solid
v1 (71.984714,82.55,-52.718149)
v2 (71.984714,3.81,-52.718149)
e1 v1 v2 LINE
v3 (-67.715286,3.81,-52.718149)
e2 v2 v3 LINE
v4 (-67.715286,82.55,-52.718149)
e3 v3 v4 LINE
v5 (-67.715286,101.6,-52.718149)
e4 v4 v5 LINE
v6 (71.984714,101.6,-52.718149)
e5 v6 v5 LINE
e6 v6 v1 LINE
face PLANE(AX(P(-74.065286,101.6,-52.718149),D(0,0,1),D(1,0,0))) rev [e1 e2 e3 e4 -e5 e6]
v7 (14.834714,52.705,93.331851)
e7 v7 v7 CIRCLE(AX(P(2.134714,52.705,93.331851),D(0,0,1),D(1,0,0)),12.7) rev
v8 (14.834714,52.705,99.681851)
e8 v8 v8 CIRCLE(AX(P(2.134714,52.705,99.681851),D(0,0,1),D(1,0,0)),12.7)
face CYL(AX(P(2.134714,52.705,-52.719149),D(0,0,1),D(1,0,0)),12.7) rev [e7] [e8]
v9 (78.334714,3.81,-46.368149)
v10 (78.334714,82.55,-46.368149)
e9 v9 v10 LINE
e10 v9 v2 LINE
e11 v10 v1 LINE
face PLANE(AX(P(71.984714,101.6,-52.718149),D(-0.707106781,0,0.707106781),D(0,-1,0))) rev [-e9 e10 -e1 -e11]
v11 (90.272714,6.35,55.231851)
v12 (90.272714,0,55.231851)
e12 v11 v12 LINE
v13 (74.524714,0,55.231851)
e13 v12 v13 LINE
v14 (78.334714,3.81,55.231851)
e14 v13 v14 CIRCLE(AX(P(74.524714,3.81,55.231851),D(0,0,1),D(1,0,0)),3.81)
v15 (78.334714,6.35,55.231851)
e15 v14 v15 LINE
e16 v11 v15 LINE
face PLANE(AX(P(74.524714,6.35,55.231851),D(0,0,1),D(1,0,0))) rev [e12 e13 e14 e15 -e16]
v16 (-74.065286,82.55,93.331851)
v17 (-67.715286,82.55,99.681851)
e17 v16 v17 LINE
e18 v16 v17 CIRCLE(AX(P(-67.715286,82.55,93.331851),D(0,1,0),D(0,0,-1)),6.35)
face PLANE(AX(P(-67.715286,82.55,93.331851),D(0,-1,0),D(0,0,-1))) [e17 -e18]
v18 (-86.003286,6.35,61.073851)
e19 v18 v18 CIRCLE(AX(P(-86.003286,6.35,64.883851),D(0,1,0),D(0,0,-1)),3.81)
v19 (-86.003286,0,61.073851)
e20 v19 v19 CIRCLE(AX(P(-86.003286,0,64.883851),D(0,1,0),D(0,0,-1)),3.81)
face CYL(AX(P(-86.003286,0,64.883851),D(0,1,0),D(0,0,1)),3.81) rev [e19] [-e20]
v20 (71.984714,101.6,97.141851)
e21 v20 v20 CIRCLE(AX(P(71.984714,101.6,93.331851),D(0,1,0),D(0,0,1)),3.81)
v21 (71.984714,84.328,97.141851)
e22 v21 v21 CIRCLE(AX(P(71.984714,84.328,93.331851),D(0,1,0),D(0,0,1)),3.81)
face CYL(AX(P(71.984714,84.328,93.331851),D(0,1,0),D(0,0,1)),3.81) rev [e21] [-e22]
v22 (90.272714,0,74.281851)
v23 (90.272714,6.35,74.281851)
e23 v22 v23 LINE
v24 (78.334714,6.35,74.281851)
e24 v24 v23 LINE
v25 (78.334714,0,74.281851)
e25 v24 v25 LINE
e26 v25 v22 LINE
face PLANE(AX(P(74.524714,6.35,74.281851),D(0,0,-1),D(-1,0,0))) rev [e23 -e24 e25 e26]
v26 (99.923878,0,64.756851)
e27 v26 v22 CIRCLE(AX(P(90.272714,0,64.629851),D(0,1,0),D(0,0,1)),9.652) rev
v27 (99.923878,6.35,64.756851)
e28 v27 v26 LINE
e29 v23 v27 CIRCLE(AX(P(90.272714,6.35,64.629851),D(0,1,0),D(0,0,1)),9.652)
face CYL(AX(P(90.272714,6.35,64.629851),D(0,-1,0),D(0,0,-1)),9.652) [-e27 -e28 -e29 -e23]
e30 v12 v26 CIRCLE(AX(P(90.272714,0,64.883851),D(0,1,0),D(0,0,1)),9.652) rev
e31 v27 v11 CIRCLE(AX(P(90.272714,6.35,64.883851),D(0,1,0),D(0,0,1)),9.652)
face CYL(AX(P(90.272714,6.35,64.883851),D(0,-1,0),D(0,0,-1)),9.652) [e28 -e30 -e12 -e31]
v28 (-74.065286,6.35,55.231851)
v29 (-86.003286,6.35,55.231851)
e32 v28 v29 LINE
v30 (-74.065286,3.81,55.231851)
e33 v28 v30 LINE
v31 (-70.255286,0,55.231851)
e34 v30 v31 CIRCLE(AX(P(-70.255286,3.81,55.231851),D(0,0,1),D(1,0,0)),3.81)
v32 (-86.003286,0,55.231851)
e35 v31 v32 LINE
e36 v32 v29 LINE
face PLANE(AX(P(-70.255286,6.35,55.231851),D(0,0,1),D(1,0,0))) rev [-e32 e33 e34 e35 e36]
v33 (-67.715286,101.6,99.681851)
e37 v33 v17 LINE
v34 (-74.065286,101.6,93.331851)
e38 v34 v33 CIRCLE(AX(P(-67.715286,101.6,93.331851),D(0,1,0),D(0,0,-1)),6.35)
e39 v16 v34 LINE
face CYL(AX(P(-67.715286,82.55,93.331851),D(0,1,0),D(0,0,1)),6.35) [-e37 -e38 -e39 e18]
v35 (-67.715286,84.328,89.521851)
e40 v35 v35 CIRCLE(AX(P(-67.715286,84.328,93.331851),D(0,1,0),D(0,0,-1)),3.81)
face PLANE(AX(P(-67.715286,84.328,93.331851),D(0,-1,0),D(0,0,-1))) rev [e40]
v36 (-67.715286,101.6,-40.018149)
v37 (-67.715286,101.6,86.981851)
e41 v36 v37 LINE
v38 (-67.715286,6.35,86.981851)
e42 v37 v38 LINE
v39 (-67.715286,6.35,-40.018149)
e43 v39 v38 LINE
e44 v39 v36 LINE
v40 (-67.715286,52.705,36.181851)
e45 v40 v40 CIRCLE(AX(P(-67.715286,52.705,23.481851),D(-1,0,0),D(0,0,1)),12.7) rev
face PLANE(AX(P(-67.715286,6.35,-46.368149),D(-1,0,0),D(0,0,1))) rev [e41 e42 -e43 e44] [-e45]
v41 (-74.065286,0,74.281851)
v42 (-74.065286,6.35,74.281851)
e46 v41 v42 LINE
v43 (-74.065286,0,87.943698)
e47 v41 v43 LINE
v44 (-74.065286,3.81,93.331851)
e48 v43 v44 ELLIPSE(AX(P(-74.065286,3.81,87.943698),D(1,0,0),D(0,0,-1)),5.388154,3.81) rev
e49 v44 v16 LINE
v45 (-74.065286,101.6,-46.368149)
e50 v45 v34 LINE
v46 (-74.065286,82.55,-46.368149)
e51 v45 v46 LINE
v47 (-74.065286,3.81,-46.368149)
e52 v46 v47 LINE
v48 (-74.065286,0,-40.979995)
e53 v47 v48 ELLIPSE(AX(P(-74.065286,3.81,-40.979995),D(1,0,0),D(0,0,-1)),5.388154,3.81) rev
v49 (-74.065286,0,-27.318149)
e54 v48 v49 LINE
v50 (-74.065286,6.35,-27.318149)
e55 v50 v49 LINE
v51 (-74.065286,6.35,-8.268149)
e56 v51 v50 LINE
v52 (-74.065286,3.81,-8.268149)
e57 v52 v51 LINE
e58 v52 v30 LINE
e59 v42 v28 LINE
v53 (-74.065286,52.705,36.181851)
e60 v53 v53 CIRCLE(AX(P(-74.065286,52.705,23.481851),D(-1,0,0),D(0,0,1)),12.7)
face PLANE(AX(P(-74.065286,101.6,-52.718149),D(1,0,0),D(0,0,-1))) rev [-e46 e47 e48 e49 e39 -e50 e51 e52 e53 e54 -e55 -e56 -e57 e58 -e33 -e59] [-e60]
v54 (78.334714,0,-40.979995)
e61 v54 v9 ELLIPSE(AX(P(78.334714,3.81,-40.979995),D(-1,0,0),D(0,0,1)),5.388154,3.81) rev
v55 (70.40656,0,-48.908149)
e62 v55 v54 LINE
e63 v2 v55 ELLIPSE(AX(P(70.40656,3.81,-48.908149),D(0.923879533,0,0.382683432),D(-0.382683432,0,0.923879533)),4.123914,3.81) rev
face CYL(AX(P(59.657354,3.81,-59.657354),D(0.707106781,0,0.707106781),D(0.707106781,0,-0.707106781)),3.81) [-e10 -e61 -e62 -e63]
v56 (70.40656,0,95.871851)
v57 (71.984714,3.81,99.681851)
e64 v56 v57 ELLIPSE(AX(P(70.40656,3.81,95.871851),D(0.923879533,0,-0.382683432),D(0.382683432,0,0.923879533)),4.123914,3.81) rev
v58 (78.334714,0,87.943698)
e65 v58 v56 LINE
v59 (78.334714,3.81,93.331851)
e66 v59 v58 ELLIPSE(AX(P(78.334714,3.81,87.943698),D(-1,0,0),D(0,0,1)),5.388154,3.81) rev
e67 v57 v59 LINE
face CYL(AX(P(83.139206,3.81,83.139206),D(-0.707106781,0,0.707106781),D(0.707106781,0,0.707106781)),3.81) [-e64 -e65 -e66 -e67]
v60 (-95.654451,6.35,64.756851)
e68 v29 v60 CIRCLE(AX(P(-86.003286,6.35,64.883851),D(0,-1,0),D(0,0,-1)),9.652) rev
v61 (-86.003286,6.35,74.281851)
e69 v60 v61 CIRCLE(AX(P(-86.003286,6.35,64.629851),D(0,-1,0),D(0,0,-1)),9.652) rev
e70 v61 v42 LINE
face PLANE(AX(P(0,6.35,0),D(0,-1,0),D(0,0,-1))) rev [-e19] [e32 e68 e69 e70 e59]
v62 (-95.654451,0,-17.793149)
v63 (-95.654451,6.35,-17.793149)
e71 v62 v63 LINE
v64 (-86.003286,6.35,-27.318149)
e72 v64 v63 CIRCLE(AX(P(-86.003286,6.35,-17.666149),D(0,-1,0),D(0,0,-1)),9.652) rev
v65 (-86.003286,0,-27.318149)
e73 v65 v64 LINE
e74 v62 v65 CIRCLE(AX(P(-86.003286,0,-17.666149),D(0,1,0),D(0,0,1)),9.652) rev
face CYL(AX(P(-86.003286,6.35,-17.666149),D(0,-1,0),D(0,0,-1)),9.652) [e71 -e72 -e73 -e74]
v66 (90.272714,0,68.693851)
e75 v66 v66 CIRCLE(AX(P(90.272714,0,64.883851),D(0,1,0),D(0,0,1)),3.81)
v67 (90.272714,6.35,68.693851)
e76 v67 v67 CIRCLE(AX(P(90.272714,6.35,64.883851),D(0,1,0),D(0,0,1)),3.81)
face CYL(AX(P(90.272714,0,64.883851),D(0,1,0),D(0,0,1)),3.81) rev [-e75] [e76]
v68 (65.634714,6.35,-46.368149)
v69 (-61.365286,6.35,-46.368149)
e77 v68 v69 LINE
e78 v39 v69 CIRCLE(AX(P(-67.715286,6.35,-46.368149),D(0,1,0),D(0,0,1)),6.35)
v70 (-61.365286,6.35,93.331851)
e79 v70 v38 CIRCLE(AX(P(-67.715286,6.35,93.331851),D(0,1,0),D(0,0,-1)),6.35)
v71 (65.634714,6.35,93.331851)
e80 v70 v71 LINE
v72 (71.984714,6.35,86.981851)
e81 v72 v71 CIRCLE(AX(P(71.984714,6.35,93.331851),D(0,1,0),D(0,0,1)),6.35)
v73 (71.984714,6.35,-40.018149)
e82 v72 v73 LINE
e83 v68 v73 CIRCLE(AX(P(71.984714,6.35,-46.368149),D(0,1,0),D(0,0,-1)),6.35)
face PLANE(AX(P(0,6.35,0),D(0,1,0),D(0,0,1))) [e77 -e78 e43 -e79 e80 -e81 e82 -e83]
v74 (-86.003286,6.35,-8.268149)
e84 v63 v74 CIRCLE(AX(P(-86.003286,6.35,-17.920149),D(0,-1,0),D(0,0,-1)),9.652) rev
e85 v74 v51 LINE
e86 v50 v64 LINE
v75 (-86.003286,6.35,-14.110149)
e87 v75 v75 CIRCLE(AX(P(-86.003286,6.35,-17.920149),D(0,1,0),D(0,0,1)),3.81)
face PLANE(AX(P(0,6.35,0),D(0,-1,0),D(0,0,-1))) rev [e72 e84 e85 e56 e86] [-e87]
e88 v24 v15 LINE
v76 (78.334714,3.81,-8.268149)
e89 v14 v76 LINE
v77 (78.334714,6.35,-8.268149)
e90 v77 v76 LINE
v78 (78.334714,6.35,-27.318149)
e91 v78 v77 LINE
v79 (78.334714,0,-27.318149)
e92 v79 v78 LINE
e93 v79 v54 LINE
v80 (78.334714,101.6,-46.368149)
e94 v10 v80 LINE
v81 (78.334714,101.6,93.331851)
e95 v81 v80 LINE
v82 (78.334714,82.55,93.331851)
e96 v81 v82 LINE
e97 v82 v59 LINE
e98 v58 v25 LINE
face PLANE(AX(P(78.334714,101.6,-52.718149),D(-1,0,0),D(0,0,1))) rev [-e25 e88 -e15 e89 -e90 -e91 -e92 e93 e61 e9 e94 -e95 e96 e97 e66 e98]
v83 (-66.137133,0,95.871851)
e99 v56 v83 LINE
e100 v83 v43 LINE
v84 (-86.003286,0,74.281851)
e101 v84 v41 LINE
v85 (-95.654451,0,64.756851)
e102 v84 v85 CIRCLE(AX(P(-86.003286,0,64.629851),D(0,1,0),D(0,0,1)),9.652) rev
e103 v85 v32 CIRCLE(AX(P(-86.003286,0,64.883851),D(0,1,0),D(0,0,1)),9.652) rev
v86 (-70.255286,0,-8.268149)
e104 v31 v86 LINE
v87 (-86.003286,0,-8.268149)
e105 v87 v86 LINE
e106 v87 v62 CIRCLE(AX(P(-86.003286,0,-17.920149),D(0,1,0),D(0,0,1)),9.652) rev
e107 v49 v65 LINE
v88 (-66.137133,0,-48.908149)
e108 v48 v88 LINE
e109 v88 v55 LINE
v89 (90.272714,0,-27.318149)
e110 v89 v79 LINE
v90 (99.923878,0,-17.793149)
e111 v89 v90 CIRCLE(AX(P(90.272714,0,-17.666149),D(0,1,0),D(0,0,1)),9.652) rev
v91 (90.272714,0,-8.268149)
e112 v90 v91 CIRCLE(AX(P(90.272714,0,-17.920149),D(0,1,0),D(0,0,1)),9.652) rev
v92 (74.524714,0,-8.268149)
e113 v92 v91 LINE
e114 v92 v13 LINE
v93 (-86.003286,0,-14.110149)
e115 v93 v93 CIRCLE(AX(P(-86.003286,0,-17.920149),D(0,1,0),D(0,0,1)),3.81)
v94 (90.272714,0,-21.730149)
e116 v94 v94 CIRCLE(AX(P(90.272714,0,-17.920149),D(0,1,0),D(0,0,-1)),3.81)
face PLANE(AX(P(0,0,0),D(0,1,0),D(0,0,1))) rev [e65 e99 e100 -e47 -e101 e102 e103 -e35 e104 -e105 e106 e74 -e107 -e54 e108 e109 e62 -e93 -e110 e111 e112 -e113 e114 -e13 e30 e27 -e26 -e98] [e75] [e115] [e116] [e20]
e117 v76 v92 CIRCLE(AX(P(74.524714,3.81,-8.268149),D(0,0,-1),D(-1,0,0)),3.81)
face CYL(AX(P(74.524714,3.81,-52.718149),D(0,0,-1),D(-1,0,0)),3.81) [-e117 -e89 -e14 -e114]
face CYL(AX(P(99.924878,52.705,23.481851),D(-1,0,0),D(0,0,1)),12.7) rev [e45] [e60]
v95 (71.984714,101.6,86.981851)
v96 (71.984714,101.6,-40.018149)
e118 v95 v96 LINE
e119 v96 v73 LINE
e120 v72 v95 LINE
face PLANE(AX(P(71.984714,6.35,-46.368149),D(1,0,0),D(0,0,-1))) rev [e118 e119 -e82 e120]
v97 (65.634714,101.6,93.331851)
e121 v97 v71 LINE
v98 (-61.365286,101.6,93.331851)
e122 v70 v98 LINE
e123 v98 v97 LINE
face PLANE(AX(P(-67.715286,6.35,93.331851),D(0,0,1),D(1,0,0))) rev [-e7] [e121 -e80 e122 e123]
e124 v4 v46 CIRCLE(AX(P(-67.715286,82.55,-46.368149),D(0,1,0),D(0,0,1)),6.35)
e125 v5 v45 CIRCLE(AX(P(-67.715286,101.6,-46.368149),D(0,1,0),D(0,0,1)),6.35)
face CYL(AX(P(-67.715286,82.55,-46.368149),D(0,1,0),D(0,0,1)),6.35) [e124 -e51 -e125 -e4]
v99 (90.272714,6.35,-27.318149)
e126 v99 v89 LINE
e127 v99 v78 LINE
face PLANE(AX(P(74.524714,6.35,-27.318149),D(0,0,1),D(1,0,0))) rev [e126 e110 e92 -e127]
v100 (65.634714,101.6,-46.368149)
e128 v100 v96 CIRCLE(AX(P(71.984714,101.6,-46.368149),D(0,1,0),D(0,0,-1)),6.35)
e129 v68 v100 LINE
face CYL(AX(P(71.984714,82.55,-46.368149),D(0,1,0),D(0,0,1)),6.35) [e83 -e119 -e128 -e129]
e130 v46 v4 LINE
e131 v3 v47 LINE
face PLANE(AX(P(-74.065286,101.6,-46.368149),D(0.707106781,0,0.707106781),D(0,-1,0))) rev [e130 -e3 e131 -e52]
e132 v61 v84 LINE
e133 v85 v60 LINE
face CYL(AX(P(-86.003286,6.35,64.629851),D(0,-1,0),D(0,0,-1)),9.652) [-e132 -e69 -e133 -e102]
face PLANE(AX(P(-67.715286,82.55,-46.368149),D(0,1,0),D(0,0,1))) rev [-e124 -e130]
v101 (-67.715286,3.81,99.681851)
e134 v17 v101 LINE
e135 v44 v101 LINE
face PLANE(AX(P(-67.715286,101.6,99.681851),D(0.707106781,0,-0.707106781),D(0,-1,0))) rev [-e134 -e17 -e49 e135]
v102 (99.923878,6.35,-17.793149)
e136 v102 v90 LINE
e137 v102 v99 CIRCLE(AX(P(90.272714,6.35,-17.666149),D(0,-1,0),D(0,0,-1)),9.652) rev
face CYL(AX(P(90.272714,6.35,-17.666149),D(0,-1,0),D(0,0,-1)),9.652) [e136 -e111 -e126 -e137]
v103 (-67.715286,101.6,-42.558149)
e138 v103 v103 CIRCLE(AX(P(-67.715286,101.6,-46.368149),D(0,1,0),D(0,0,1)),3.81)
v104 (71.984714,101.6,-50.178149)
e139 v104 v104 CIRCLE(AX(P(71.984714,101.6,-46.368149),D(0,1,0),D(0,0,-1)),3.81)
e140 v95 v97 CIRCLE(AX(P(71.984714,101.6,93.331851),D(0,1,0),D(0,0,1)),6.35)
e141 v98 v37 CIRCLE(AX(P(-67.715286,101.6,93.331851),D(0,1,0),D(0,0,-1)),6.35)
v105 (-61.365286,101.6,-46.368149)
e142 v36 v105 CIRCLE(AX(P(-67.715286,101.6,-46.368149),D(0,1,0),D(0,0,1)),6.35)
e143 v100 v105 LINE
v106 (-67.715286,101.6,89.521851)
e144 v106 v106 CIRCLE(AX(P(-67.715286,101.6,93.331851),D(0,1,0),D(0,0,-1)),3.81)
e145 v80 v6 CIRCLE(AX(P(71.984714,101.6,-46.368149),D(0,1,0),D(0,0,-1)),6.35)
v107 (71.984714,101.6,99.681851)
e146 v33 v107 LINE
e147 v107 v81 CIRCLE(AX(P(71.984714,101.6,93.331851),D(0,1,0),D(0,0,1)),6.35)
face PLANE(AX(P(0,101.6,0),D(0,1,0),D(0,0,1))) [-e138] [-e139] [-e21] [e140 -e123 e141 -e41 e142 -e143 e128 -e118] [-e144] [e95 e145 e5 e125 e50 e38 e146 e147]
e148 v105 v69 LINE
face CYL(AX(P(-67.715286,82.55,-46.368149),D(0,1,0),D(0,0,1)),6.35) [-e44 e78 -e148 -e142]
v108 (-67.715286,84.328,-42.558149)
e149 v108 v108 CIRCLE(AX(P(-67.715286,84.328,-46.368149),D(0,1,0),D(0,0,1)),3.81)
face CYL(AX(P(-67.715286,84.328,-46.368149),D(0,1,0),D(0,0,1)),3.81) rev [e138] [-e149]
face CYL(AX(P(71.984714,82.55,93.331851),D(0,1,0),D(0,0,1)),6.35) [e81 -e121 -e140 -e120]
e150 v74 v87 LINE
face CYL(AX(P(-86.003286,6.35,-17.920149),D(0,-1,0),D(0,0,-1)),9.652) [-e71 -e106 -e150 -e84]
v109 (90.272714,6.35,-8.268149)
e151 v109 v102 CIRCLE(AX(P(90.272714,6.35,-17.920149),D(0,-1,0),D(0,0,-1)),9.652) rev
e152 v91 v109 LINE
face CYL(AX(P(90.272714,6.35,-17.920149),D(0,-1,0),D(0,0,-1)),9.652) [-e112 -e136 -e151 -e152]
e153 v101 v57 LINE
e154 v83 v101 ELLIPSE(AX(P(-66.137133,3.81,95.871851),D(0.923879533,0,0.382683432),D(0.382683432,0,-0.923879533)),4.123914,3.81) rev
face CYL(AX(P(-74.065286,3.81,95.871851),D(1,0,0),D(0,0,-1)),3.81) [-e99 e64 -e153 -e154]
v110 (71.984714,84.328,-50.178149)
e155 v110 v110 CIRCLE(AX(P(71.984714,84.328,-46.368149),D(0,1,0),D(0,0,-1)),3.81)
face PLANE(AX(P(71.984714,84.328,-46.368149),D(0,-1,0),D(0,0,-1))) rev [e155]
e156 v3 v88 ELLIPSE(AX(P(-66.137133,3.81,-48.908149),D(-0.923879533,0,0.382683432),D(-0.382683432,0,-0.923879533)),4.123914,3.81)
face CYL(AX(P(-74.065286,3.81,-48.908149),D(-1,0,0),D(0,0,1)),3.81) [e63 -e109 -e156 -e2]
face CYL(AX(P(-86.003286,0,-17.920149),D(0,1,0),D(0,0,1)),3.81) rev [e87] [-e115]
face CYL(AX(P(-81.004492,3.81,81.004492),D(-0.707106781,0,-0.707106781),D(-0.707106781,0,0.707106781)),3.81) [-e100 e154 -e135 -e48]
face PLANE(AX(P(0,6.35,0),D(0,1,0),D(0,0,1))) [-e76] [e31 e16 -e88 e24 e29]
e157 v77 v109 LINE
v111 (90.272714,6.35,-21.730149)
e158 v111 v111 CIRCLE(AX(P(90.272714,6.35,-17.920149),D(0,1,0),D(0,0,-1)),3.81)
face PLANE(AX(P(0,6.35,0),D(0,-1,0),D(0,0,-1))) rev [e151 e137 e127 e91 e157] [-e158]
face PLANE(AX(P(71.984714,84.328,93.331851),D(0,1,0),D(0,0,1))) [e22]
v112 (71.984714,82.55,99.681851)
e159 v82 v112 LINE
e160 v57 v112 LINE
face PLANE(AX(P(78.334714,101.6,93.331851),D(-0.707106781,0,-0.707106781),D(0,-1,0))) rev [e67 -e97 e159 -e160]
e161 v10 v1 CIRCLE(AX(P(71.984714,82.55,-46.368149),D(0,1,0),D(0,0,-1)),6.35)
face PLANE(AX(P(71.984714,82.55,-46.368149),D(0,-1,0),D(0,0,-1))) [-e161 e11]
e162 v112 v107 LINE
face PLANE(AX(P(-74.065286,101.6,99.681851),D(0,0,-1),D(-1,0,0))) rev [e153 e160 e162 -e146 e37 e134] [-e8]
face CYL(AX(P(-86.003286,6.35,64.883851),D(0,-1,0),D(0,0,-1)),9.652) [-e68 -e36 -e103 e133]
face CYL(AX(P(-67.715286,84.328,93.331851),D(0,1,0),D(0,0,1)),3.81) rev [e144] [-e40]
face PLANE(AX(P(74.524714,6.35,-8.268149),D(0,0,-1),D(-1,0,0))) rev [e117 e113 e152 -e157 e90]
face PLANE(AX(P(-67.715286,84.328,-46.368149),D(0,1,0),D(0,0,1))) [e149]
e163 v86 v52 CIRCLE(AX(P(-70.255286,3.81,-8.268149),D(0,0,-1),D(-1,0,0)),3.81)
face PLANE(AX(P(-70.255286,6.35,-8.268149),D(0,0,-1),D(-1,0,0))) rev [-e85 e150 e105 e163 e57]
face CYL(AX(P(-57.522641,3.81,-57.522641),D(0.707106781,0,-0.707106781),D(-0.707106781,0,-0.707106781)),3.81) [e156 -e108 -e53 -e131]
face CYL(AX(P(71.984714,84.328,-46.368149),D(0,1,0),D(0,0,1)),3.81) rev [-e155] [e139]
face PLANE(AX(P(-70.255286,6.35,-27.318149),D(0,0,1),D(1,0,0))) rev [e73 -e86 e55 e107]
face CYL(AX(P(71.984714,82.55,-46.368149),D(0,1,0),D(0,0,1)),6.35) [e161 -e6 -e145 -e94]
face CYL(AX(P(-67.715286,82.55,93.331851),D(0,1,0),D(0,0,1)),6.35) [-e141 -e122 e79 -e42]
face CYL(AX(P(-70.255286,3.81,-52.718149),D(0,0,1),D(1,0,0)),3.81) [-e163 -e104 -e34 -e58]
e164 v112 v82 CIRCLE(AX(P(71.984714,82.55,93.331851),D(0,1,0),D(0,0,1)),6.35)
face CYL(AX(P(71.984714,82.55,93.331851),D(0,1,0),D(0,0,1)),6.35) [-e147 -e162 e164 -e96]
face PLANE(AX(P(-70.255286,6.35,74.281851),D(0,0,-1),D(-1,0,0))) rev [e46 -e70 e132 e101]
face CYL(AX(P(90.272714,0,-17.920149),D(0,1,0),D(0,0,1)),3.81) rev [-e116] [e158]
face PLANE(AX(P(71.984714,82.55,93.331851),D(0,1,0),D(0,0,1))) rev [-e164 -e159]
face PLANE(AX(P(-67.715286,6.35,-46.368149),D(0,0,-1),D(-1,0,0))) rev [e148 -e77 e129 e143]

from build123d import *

# Parameters (mm, degrees)
SKETCH1_W           = 152.4
SKETCH1_H           = 152.4
BOSS_EXTRUDE1_DEPTH = 101.6
SKETCH2_W           = 25.4
SKETCH2_H           = 19.05
BOSS_EXTRUDE2_DEPTH = 6.35
SKETCH3_W           = 139.7
SKETCH3_H           = 139.7
CUT_EXTRUDE1_DEPTH  = 95.25
FILLET1_R           = 9.652
CHAMFER1_SIZE       = 6.35
SKETCH4_R           = 3.81
CUT_EXTRUDE2_DEPTH  = 171.275704178
FILLET2_R           = 3.81
SKETCH5_R           = 6.35
BOSS_EXTRUDE3_DEPTH = 19.05
BOSS_EXTRUDE4_DEPTH = 95.25
SKETCH6_R           = 3.81
CUT_EXTRUDE3_DEPTH  = 17.272
CUT_EXTRUDE4_REACH  = 210.646
SKETCH8_R           = 12.7
CUT_EXTRUDE5_REACH  = 226.792
SKETCH9_R           = 12.7


with BuildPart() as part:
    # Sketch1 → Boss-Extrude1 (new body)
    with BuildSketch(Plane(origin=(0, 0, 0), x_dir=(1, 0, 0), z_dir=(0, 1, 0))):
        with Locations((2.134713764, -23.481851401)):
            Rectangle(SKETCH1_W, SKETCH1_H)
    extrude(amount=BOSS_EXTRUDE1_DEPTH)

    # Sketch2 → Boss-Extrude2 (add)
    with BuildSketch(Plane(origin=(0, 0, 0), x_dir=(1, 0, 0), z_dir=(0, 1, 0))):
        with Locations((87.224713764, -64.756851401)):
            Rectangle(SKETCH2_W, SKETCH2_H)
        with Locations((-82.955286236, -64.756851401)):
            Rectangle(SKETCH2_W, SKETCH2_H)
        with Locations((87.224713764, 17.793148599)):
            Rectangle(SKETCH2_W, SKETCH2_H)
        with Locations((-82.955286236, 17.793148599)):
            Rectangle(SKETCH2_W, SKETCH2_H)
    extrude(amount=BOSS_EXTRUDE2_DEPTH)

    # Sketch3 → Cut-Extrude1 (cut)
    with BuildSketch(Plane(origin=(0, 101.6, 0), x_dir=(1, 0, 0), z_dir=(0, 1, 0))):
        with Locations((2.134713764, -23.481851401)):
            Rectangle(SKETCH3_W, SKETCH3_H)
    extrude(amount=-CUT_EXTRUDE1_DEPTH, mode=Mode.SUBTRACT)

    # Fillet1
    # the kernel refuses this fillet: 9.652 mm, written as the material it takes off along each edge
    with BuildSketch(Plane(origin=(-95.655286236, -24.13, -27.318148599), x_dir=(1, 0, 0), z_dir=(0, 1, 0)), Plane(origin=(-95.655286236, -24.13, 55.231851401), x_dir=(1, 0, 0), z_dir=(0, 1, 0)), Plane(origin=(99.924713764, -24.13, -8.268148599), x_dir=(-1, 0, 0), z_dir=(0, 1, 0)), Plane(origin=(99.924713764, -24.13, 74.281851401), x_dir=(-1, 0, 0), z_dir=(0, 1, 0))) as fillet1_piece_1:
        with BuildLine():
            CenterArc((FILLET1_R, -FILLET1_R), FILLET1_R, 90, 90)
            Line((0, -FILLET1_R), (0, 0))
            Line((0, 0), (FILLET1_R, 0))
        make_face()
    extrude(amount=54.61, mode=Mode.SUBTRACT)
    with BuildSketch(Plane(origin=(-95.655286236, -24.13, -8.268148599), x_dir=(1, 0, 0), z_dir=(0, 1, 0)), Plane(origin=(-95.655286236, -24.13, 74.281851401), x_dir=(1, 0, 0), z_dir=(0, 1, 0)), Plane(origin=(99.924713764, -24.13, -27.318148599), x_dir=(-1, 0, 0), z_dir=(0, 1, 0)), Plane(origin=(99.924713764, -24.13, 55.231851401), x_dir=(-1, 0, 0), z_dir=(0, 1, 0))) as fillet1_piece_2:
        with BuildLine():
            CenterArc((FILLET1_R, FILLET1_R), FILLET1_R, 180, 90)
            Line((0, FILLET1_R), (0, 0))
            Line((0, 0), (FILLET1_R, 0))
        make_face()
    extrude(amount=54.61, mode=Mode.SUBTRACT)

    # Chamfer1
    chamfer1_edges = [part.edges().sort_by_distance(p)[0] for p in [
        (-74.065286236, 50.8, -52.718148599),
        (78.334713764, 50.8, -52.718148599),
        (78.334713764, 50.8, 99.681851401),
        (-74.065286236, 50.8, 99.681851401),
    ]]
    chamfer(chamfer1_edges, length=CHAMFER1_SIZE)

    # Sketch4 → Cut-Extrude2 (cut, through all)
    with BuildSketch(Plane(origin=(0, 6.35, 0), x_dir=(1, 0, 0), z_dir=(0, 1, 0))):
        with Locations(Location((90.272713764, -64.883851401, 0), (0, 0, 270))):
            Circle(SKETCH4_R)
        with Locations(Location((-86.003286236, -64.883851401, 0), (0, 0, 90))):
            Circle(SKETCH4_R)
        with Locations(Location((90.272713764, 17.920148599, 0), (0, 0, 90))):
            Circle(SKETCH4_R)
        with Locations(Location((-86.003286236, 17.920148599, 0), (0, 0, 270))):
            Circle(SKETCH4_R)
    extrude(amount=-CUT_EXTRUDE2_DEPTH, mode=Mode.SUBTRACT)

    # Fillet2
    fillet2_edges = [part.edges().sort_by_distance(p)[0] for p in [
        (-70.890286236, 0, 96.506851401),
        (-74.065286236, 0, 23.481851401),
        (-70.890286236, 0, -49.543148599),
        (2.134713764, 0, -52.718148599),
        (75.159713764, 0, -49.543148599),
        (78.334713764, 0, 23.481851401),
        (75.159713764, 0, 96.506851401),
        (2.134713764, 0, 99.681851401),
    ]]
    fillet(fillet2_edges, radius=FILLET2_R)

    # Sketch5 → Boss-Extrude3 (add)
    with BuildSketch(Plane(origin=(0, 101.6, 0), x_dir=(1, 0, 0), z_dir=(0, 1, 0))):
        with Locations((71.984713764, -93.331851401)):
            Circle(SKETCH5_R)
        with Locations((-67.715286236, -93.331851401)):
            Circle(SKETCH5_R)
        with Locations((-67.715286236, 46.368148599)):
            Circle(SKETCH5_R)
        with Locations((71.984713764, 46.368148599)):
            Circle(SKETCH5_R)
    extrude(amount=-BOSS_EXTRUDE3_DEPTH)

    # Sketch7 → Boss-Extrude4 (add)
    with BuildSketch(Plane(origin=(0, 101.6, 0), x_dir=(1, 0, 0), z_dir=(0, 1, 0))):
        with BuildLine():
            Line((71.984713764, -99.681851401), (78.334713764, -93.331851401))
            ThreePointArc((78.334713764, -93.331851401), (67.494585703, -88.84172334), (71.984713764, -99.681851401))
        make_face()
        with BuildLine():
            Line((-67.715286236, -99.681851401), (-74.065286236, -93.331851401))
            ThreePointArc((-74.065286236, -93.331851401), (-63.225158176, -88.84172334), (-67.715286236, -99.681851401))
        make_face()
        with BuildLine():
            Line((71.984713764, 52.718148599), (78.334713764, 46.368148599))
            ThreePointArc((78.334713764, 46.368148599), (67.494585703, 41.878020539), (71.984713764, 52.718148599))
        make_face()
        with BuildLine():
            Line((-67.715286236, 52.718148599), (-74.065286236, 46.368148599))
            ThreePointArc((-74.065286236, 46.368148599), (-63.225158176, 41.878020539), (-67.715286236, 52.718148599))
        make_face()
    extrude(amount=-BOSS_EXTRUDE4_DEPTH)

    # Sketch6 → Cut-Extrude3 (cut)
    with BuildSketch(Plane(origin=(0, 101.6, 0), x_dir=(1, 0, 0), z_dir=(0, 1, 0))):
        with Locations(Location((71.984713764, -93.331851401, 0), (0, 0, 270))):
            Circle(SKETCH6_R)
        with Locations(Location((-67.715286236, -93.331851401, 0), (0, 0, 90))):
            Circle(SKETCH6_R)
        with Locations(Location((71.984713764, 46.368148599, 0), (0, 0, 90))):
            Circle(SKETCH6_R)
        with Locations(Location((-67.715286236, 46.368148599, 0), (0, 0, 270))):
            Circle(SKETCH6_R)
    extrude(amount=-CUT_EXTRUDE3_DEPTH, mode=Mode.SUBTRACT)

    # Sketch8 → Cut-Extrude4 (cut, up to next)
    with BuildSketch(Plane.XY.offset(99.681851401), mode=Mode.PRIVATE) as cut_extrude4_sk1:
        with Locations((2.134713764, 52.705)):
            Circle(SKETCH8_R)
    cut_extrude4_tool1 = extrude(cut_extrude4_sk1.sketch, amount=-CUT_EXTRUDE4_REACH, mode=Mode.PRIVATE) & part.part
    add(cut_extrude4_tool1.solids().sort_by_distance((2.134714, 52.705, 99.681851))[0], mode=Mode.SUBTRACT)

    # Sketch9 → Cut-Extrude5 (cut, up to next)
    with BuildSketch(Plane.ZY.offset(74.065286236), mode=Mode.PRIVATE) as cut_extrude5_sk1:
        with Locations((23.481851401, 52.705)):
            Circle(SKETCH9_R)
    cut_extrude5_tool1 = extrude(cut_extrude5_sk1.sketch, amount=-CUT_EXTRUDE5_REACH, mode=Mode.PRIVATE) & part.part
    add(cut_extrude5_tool1.solids().sort_by_distance((-74.065286, 52.705, 23.481851))[0], mode=Mode.SUBTRACT)


solid = part.part
